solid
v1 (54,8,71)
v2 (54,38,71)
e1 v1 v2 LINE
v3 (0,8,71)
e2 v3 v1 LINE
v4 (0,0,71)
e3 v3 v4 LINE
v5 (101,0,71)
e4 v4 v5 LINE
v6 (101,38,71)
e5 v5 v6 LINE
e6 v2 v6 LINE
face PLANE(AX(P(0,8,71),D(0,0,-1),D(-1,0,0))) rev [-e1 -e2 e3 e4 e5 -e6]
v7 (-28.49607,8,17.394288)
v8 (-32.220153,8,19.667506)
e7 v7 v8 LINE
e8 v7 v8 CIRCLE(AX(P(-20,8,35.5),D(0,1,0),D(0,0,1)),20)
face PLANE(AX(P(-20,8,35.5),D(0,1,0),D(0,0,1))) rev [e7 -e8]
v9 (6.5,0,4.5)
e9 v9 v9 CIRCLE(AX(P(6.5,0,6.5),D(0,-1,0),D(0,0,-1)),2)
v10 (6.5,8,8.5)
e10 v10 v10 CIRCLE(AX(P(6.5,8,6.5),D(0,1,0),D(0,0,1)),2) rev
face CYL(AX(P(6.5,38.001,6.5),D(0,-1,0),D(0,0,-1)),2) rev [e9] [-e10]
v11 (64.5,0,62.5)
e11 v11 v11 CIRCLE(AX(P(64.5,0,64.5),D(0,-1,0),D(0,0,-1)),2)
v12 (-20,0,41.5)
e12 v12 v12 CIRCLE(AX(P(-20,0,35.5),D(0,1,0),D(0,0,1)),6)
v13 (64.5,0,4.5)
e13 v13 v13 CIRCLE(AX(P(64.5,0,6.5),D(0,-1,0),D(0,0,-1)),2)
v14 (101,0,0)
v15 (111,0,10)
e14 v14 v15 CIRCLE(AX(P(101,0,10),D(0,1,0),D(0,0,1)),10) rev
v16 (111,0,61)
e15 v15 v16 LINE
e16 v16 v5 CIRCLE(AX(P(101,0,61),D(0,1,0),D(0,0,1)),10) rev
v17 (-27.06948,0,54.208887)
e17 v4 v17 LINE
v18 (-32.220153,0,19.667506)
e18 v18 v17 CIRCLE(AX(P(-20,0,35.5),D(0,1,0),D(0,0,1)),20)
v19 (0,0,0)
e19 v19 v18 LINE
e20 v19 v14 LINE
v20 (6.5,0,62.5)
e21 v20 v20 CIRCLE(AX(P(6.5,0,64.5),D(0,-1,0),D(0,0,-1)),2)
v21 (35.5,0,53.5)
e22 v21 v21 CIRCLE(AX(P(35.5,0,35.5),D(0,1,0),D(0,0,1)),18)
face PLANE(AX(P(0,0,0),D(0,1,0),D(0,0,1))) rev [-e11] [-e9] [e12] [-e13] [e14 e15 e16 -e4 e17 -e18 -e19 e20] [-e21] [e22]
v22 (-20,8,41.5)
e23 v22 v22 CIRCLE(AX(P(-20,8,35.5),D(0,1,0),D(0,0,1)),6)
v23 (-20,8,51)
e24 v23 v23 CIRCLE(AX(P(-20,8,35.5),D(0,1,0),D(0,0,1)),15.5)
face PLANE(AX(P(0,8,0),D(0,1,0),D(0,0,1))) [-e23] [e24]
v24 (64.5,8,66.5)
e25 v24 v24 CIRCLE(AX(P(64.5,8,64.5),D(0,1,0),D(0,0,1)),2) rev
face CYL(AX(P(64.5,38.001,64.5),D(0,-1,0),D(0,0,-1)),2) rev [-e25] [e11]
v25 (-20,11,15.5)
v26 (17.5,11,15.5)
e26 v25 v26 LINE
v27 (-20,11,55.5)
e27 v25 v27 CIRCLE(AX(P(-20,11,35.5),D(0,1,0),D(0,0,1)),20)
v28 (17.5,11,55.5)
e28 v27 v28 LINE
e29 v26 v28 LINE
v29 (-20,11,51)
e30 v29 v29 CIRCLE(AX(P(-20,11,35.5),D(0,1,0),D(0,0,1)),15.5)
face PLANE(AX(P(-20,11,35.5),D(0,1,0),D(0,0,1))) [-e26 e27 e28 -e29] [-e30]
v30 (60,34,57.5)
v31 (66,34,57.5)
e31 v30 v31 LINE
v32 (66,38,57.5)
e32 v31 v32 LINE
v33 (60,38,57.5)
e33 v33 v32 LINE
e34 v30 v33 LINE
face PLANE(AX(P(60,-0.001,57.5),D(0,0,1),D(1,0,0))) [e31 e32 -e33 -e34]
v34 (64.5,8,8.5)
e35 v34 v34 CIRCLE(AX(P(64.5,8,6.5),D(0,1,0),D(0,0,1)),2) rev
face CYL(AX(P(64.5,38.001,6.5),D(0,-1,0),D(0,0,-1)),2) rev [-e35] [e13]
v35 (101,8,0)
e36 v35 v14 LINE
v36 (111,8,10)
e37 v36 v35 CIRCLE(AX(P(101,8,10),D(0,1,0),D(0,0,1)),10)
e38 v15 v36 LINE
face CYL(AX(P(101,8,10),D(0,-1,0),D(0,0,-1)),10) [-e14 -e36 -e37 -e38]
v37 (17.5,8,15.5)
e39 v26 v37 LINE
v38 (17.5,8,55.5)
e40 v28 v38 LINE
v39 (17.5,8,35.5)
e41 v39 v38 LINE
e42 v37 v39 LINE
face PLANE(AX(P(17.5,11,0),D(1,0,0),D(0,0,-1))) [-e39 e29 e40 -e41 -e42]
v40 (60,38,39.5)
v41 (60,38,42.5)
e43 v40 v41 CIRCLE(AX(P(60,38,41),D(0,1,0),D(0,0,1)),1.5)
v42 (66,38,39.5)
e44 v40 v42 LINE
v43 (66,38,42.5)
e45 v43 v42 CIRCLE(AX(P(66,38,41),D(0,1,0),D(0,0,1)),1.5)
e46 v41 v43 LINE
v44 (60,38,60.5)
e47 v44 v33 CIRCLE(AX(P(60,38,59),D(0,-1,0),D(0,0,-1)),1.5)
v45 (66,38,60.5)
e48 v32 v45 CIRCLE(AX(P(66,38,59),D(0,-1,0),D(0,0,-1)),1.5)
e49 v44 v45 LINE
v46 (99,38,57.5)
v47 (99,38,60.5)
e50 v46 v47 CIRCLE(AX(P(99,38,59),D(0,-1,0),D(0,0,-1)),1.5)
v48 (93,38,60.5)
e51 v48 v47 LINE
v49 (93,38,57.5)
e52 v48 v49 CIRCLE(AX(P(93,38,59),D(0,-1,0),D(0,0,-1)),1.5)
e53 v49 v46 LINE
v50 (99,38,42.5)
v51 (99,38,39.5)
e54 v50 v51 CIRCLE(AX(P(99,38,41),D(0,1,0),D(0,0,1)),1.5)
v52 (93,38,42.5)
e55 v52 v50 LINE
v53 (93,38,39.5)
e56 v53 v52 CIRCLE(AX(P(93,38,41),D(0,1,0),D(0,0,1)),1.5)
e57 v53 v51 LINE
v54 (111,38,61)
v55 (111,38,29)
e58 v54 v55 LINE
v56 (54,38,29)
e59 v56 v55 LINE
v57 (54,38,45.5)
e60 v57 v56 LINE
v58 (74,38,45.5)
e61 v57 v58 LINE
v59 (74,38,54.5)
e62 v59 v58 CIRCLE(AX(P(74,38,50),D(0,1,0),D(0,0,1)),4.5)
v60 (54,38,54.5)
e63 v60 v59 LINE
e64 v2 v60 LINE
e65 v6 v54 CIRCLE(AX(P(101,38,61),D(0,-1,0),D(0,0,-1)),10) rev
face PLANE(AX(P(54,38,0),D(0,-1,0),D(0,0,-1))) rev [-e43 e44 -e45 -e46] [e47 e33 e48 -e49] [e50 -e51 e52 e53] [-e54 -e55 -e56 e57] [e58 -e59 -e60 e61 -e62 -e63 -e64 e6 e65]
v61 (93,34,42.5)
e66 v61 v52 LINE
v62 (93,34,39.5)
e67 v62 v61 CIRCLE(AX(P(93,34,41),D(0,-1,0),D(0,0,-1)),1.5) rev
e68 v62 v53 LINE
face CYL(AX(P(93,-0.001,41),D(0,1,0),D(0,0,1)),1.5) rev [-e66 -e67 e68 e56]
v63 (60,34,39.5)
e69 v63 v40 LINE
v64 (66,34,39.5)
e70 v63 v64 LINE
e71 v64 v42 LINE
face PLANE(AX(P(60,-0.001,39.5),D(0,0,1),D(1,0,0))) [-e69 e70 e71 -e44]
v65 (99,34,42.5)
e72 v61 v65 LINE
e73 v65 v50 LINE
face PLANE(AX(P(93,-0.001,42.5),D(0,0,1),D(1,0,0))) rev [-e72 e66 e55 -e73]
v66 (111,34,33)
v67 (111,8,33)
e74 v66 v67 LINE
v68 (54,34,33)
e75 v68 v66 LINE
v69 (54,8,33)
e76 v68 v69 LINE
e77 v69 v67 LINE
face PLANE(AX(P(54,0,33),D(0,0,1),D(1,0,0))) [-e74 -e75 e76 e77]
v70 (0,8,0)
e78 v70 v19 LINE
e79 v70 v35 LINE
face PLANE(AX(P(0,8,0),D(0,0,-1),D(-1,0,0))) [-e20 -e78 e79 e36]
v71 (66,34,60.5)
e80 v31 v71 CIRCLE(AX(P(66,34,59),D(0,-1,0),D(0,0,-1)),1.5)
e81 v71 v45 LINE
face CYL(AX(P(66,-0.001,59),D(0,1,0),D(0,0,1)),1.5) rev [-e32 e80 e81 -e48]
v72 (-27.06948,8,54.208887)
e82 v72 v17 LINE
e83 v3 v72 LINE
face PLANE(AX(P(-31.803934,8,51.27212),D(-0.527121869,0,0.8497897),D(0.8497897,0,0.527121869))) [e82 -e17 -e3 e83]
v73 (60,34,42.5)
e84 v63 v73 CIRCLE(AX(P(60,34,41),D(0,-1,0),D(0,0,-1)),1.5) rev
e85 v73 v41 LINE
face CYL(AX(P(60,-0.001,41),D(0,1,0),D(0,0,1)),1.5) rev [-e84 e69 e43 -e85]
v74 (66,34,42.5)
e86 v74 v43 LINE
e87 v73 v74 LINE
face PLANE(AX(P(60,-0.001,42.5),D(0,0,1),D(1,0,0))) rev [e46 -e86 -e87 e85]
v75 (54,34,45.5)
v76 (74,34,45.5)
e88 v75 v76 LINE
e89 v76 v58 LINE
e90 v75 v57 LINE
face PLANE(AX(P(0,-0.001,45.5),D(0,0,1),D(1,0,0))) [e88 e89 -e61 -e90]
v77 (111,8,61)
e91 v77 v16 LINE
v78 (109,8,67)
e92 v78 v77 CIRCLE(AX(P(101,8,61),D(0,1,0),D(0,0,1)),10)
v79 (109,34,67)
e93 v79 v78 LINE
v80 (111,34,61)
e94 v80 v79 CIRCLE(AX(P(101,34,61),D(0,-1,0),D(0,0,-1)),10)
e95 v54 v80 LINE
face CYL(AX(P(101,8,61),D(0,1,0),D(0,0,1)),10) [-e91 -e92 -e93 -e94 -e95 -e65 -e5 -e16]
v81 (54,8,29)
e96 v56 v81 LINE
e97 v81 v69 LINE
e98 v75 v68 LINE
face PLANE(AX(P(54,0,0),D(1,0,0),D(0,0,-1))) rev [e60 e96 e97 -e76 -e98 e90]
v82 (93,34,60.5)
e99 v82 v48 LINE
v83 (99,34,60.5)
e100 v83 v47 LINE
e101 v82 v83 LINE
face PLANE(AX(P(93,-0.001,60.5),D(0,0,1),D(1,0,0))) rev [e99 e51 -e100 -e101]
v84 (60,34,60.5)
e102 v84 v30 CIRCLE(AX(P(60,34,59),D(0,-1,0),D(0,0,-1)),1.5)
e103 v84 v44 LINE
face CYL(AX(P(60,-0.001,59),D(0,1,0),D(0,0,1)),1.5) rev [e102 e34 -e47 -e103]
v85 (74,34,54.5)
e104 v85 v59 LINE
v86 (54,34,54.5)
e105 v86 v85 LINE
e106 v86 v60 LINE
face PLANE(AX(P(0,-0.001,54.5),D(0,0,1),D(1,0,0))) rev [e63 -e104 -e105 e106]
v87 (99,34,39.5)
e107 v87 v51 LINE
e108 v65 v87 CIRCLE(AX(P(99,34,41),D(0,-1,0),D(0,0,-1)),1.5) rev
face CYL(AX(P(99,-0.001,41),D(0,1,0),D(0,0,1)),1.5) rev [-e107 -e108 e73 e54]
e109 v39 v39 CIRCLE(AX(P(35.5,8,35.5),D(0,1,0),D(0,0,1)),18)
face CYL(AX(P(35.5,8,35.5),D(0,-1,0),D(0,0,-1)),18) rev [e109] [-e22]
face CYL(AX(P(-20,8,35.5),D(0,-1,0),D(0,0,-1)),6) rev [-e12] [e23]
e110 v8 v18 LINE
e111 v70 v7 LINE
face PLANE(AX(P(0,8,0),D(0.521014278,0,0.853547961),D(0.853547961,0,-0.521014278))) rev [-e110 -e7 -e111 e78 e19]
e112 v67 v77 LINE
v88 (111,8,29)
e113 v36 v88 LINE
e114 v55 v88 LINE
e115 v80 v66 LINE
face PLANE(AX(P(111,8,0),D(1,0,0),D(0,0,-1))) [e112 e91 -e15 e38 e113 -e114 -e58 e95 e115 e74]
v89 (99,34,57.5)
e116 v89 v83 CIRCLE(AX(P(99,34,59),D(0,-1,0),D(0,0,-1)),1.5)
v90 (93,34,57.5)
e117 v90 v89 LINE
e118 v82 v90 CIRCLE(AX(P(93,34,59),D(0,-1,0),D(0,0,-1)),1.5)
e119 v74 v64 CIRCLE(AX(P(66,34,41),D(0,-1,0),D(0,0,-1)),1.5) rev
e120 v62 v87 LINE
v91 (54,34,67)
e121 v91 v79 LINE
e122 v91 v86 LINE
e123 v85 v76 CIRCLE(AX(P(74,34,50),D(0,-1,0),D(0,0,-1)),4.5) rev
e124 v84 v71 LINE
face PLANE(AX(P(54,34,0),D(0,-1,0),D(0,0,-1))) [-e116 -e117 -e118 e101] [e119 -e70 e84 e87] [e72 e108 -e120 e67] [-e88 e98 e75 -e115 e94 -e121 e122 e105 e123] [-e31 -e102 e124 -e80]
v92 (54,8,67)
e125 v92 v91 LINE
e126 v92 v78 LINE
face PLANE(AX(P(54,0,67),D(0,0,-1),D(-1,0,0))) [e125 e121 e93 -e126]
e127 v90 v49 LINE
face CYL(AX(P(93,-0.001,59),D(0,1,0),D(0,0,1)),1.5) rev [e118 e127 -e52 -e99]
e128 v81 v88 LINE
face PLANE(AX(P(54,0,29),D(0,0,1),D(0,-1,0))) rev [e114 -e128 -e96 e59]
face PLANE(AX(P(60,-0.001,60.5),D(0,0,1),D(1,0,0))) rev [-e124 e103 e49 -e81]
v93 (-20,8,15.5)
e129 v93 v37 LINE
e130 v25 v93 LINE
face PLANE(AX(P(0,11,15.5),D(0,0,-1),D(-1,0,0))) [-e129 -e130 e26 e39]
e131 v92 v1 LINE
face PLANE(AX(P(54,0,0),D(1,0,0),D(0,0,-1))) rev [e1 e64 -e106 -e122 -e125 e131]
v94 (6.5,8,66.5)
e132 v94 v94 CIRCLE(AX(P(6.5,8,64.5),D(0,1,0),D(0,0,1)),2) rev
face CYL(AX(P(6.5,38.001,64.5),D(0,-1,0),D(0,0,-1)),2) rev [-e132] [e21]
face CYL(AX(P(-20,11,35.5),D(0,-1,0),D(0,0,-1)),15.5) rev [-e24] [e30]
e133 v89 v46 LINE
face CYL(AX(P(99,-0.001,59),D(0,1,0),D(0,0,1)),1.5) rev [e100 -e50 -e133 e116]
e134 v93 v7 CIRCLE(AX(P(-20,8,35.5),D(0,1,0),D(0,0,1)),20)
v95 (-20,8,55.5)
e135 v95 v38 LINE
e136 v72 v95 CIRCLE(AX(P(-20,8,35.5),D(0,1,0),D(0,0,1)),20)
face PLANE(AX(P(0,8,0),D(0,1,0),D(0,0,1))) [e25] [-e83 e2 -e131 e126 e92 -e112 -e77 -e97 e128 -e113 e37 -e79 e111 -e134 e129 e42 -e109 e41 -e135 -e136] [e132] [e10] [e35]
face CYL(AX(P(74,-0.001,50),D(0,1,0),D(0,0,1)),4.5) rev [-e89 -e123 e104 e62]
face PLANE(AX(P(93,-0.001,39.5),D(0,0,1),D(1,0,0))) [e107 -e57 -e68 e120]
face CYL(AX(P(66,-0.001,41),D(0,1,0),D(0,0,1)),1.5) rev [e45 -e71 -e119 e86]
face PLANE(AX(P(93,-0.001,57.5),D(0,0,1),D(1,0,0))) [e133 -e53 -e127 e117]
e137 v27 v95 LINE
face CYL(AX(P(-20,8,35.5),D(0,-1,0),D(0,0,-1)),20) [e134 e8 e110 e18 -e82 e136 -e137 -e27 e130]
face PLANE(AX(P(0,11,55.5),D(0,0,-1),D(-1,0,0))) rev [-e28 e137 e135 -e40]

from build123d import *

# Parameters (mm, degrees)
SKETCH1_R           = 18
SKETCH1_R_2         = 6
BOSS_EXTRUDE4_DEPTH = 8
SKETCH5_R           = 20
SKETCH5_R_2         = 15.5
BOSS_EXTRUDE5_DEPTH = 3
SKETCH6_W           = 34
SKETCH6_H           = 4
BOSS_EXTRUDE6_DEPTH = 57
CUT_EXTRUDE1_REACH  = 139.135
CUT_EXTRUDE2_REACH  = 139.135
SKETCH9_R           = 2
BOSS_EXTRUDE8_DEPTH = 3
FILLET1_R           = 10
FILLET2_R           = 10


with BuildPart() as part:
    # Sketch1 → Boss-Extrude4 (new body)
    with BuildSketch(Plane(origin=(0, 0, 0), x_dir=(1, 0, 0), z_dir=(0, 1, 0))):
        with BuildLine():
            Line((0, 0), (-32.22015265, -19.667505907))
            ThreePointArc((-32.22015265, -19.667505907), (-39.781284933, -38.449706153), (-27.069479945, -54.208887014))
            Line((-27.069479945, -54.208887014), (0, -71))
            Line((0, -71), (111, -71))
            Line((111, -71), (111, 0))
            Line((111, 0), (0, 0))
        make_face()
        with Locations(Location((35.5, -35.5, 0), (0, 0, 270))):
            Circle(SKETCH1_R, mode=Mode.SUBTRACT)
        with Locations(Location((-20, -35.5, 0), (0, 0, 270))):
            Circle(SKETCH1_R_2, mode=Mode.SUBTRACT)
    extrude(amount=BOSS_EXTRUDE4_DEPTH)

    # Sketch5 → Boss-Extrude5 (add)
    with BuildSketch(Plane(origin=(0, 8, 0), x_dir=(1, 0, 0), z_dir=(0, 1, 0))):
        with Locations(Location((-20, -35.5, 0), (0, 0, 115.138226689))):
            Circle(SKETCH5_R)
        with Locations(Location((-20, -35.5, 0), (0, 0, 270))):
            Circle(SKETCH5_R_2, mode=Mode.SUBTRACT)
    extrude(amount=BOSS_EXTRUDE5_DEPTH)

    # Sketch6 → Boss-Extrude6 (add)
    with BuildSketch(Plane(origin=(111, 0, 0), x_dir=(0, 0, -1), z_dir=(1, 0, 0))):
        Polygon((-71, 38), (-71, 8), (-67, 8), (-67, 34), (-67, 38), align=None)
        with Locations((-50, 36)):
            Rectangle(SKETCH6_W, SKETCH6_H)
        Polygon((-33, 34), (-33, 8), (-29, 8), (-29, 38), (-33, 38), align=None)
    extrude(amount=-BOSS_EXTRUDE6_DEPTH)

    # Sketch7 → Cut-Extrude1 (cut, up to next)
    with BuildSketch(Plane(origin=(0, 38, 0), x_dir=(1, 0, 0), z_dir=(0, 1, 0)), mode=Mode.PRIVATE) as cut_extrude1_sk1:
        with BuildLine():
            Line((74, -45.5), (54, -45.5))
            Line((54, -45.5), (54, -50))
            Line((54, -50), (54, -54.5))
            Line((54, -54.5), (74, -54.5))
            ThreePointArc((74, -54.5), (78.5, -50), (74, -45.5))
        make_face()
    cut_extrude1_tool1 = extrude(cut_extrude1_sk1.sketch, amount=-CUT_EXTRUDE1_REACH, mode=Mode.PRIVATE) & part.part
    # Sketch7 → Cut-Extrude1 (cut, up to next)
    with BuildSketch(Plane(origin=(0, 38, 0), x_dir=(1, 0, 0), z_dir=(0, 1, 0)), mode=Mode.PRIVATE) as cut_extrude1_sk2:
        with BuildLine():
            Line((60, -57.5), (66, -57.5))
            ThreePointArc((66, -57.5), (67.5, -59), (66, -60.5))
            Line((66, -60.5), (60, -60.5))
            ThreePointArc((60, -60.5), (58.5, -59), (60, -57.5))
        make_face()
    cut_extrude1_tool2 = extrude(cut_extrude1_sk2.sketch, amount=-CUT_EXTRUDE1_REACH, mode=Mode.PRIVATE) & part.part
    # Sketch7 → Cut-Extrude1 (cut, up to next)
    with BuildSketch(Plane(origin=(0, 38, 0), x_dir=(1, 0, 0), z_dir=(0, 1, 0)), mode=Mode.PRIVATE) as cut_extrude1_sk3:
        with BuildLine():
            Line((60, -39.5), (66, -39.5))
            ThreePointArc((66, -39.5), (67.5, -41), (66, -42.5))
            Line((66, -42.5), (60, -42.5))
            ThreePointArc((60, -42.5), (58.5, -41), (60, -39.5))
        make_face()
    cut_extrude1_tool3 = extrude(cut_extrude1_sk3.sketch, amount=-CUT_EXTRUDE1_REACH, mode=Mode.PRIVATE) & part.part
    # Sketch7 → Cut-Extrude1 (cut, up to next)
    with BuildSketch(Plane(origin=(0, 38, 0), x_dir=(1, 0, 0), z_dir=(0, 1, 0)), mode=Mode.PRIVATE) as cut_extrude1_sk4:
        with BuildLine():
            Line((93, -57.5), (99, -57.5))
            ThreePointArc((99, -57.5), (100.5, -59), (99, -60.5))
            Line((99, -60.5), (93, -60.5))
            ThreePointArc((93, -60.5), (91.5, -59), (93, -57.5))
        make_face()
    cut_extrude1_tool4 = extrude(cut_extrude1_sk4.sketch, amount=-CUT_EXTRUDE1_REACH, mode=Mode.PRIVATE) & part.part
    # Sketch7 → Cut-Extrude1 (cut, up to next)
    with BuildSketch(Plane(origin=(0, 38, 0), x_dir=(1, 0, 0), z_dir=(0, 1, 0)), mode=Mode.PRIVATE) as cut_extrude1_sk5:
        with BuildLine():
            Line((93, -42.5), (99, -42.5))
            ThreePointArc((99, -42.5), (100.5, -41), (99, -39.5))
            Line((99, -39.5), (93, -39.5))
            ThreePointArc((93, -39.5), (91.5, -41), (93, -42.5))
        make_face()
    cut_extrude1_tool5 = extrude(cut_extrude1_sk5.sketch, amount=-CUT_EXTRUDE1_REACH, mode=Mode.PRIVATE) & part.part
    add(cut_extrude1_tool1.solids().sort_by_distance((65.788578, 38, 50))[0], mode=Mode.SUBTRACT)
    add(cut_extrude1_tool2.solids().sort_by_distance((63, 38, 59))[0], mode=Mode.SUBTRACT)
    add(cut_extrude1_tool3.solids().sort_by_distance((63, 38, 41))[0], mode=Mode.SUBTRACT)
    add(cut_extrude1_tool4.solids().sort_by_distance((96, 38, 59))[0], mode=Mode.SUBTRACT)
    add(cut_extrude1_tool5.solids().sort_by_distance((96, 38, 41))[0], mode=Mode.SUBTRACT)

    # Sketch9 → Cut-Extrude2 (cut, up to next)
    with BuildSketch(Plane.XZ, mode=Mode.PRIVATE) as cut_extrude2_sk1:
        with Locations(Location((64.5, 64.5, 0), (0, 0, 270))):
            Circle(SKETCH9_R)
    cut_extrude2_tool1 = extrude(cut_extrude2_sk1.sketch, amount=-CUT_EXTRUDE2_REACH, mode=Mode.PRIVATE) & part.part
    # Sketch9 → Cut-Extrude2 (cut, up to next)
    with BuildSketch(Plane.XZ, mode=Mode.PRIVATE) as cut_extrude2_sk2:
        with Locations(Location((6.5, 64.5, 0), (0, 0, 270))):
            Circle(SKETCH9_R)
    cut_extrude2_tool2 = extrude(cut_extrude2_sk2.sketch, amount=-CUT_EXTRUDE2_REACH, mode=Mode.PRIVATE) & part.part
    # Sketch9 → Cut-Extrude2 (cut, up to next)
    with BuildSketch(Plane.XZ, mode=Mode.PRIVATE) as cut_extrude2_sk3:
        with Locations(Location((6.5, 6.5, 0), (0, 0, 270))):
            Circle(SKETCH9_R)
    cut_extrude2_tool3 = extrude(cut_extrude2_sk3.sketch, amount=-CUT_EXTRUDE2_REACH, mode=Mode.PRIVATE) & part.part
    # Sketch9 → Cut-Extrude2 (cut, up to next)
    with BuildSketch(Plane.XZ, mode=Mode.PRIVATE) as cut_extrude2_sk4:
        with Locations(Location((64.5, 6.5, 0), (0, 0, 270))):
            Circle(SKETCH9_R)
    cut_extrude2_tool4 = extrude(cut_extrude2_sk4.sketch, amount=-CUT_EXTRUDE2_REACH, mode=Mode.PRIVATE) & part.part
    add(cut_extrude2_tool1.solids().sort_by_distance((64.5, 0, 64.5))[0], mode=Mode.SUBTRACT)
    add(cut_extrude2_tool2.solids().sort_by_distance((6.5, 0, 64.5))[0], mode=Mode.SUBTRACT)
    add(cut_extrude2_tool3.solids().sort_by_distance((6.5, 0, 6.5))[0], mode=Mode.SUBTRACT)
    add(cut_extrude2_tool4.solids().sort_by_distance((64.5, 0, 6.5))[0], mode=Mode.SUBTRACT)

    # Sketch10 → Boss-Extrude8 (add)
    with BuildSketch(Plane(origin=(0, 8, 0), x_dir=(1, 0, 0), z_dir=(0, 1, 0))):
        with BuildLine():
            Line((17.5, -15.5), (-20, -15.5))
            ThreePointArc((-20, -15.5), (-5.857864376, -21.357864376), (0, -35.5))
            ThreePointArc((0, -35.5), (-5.857864376, -49.642135624), (-20, -55.5))
            Line((-20, -55.5), (17.5, -55.5))
            Line((17.5, -55.5), (17.5, -15.5))
        make_face()
    extrude(amount=BOSS_EXTRUDE8_DEPTH)

    # Fillet1
    # the kernel refuses this fillet: 10 mm, written as the material it takes off along each edge
    with BuildSketch(Plane(origin=(111, 63, 71), x_dir=(-1, 0, 0), z_dir=(0, -1, 0))) as fillet1_piece_1:
        with BuildLine():
            CenterArc((FILLET1_R, FILLET1_R), FILLET1_R, 180, 90)
            Line((0, FILLET1_R), (0, 0))
            Line((0, 0), (FILLET1_R, 0))
        make_face()
    extrude(amount=88, mode=Mode.SUBTRACT)

    # Fillet2
    fillet2_edges = [part.edges().sort_by_distance(p)[0] for p in [
        (111, 4, 0),
    ]]
    fillet(fillet2_edges, radius=FILLET2_R)


solid = part.part
